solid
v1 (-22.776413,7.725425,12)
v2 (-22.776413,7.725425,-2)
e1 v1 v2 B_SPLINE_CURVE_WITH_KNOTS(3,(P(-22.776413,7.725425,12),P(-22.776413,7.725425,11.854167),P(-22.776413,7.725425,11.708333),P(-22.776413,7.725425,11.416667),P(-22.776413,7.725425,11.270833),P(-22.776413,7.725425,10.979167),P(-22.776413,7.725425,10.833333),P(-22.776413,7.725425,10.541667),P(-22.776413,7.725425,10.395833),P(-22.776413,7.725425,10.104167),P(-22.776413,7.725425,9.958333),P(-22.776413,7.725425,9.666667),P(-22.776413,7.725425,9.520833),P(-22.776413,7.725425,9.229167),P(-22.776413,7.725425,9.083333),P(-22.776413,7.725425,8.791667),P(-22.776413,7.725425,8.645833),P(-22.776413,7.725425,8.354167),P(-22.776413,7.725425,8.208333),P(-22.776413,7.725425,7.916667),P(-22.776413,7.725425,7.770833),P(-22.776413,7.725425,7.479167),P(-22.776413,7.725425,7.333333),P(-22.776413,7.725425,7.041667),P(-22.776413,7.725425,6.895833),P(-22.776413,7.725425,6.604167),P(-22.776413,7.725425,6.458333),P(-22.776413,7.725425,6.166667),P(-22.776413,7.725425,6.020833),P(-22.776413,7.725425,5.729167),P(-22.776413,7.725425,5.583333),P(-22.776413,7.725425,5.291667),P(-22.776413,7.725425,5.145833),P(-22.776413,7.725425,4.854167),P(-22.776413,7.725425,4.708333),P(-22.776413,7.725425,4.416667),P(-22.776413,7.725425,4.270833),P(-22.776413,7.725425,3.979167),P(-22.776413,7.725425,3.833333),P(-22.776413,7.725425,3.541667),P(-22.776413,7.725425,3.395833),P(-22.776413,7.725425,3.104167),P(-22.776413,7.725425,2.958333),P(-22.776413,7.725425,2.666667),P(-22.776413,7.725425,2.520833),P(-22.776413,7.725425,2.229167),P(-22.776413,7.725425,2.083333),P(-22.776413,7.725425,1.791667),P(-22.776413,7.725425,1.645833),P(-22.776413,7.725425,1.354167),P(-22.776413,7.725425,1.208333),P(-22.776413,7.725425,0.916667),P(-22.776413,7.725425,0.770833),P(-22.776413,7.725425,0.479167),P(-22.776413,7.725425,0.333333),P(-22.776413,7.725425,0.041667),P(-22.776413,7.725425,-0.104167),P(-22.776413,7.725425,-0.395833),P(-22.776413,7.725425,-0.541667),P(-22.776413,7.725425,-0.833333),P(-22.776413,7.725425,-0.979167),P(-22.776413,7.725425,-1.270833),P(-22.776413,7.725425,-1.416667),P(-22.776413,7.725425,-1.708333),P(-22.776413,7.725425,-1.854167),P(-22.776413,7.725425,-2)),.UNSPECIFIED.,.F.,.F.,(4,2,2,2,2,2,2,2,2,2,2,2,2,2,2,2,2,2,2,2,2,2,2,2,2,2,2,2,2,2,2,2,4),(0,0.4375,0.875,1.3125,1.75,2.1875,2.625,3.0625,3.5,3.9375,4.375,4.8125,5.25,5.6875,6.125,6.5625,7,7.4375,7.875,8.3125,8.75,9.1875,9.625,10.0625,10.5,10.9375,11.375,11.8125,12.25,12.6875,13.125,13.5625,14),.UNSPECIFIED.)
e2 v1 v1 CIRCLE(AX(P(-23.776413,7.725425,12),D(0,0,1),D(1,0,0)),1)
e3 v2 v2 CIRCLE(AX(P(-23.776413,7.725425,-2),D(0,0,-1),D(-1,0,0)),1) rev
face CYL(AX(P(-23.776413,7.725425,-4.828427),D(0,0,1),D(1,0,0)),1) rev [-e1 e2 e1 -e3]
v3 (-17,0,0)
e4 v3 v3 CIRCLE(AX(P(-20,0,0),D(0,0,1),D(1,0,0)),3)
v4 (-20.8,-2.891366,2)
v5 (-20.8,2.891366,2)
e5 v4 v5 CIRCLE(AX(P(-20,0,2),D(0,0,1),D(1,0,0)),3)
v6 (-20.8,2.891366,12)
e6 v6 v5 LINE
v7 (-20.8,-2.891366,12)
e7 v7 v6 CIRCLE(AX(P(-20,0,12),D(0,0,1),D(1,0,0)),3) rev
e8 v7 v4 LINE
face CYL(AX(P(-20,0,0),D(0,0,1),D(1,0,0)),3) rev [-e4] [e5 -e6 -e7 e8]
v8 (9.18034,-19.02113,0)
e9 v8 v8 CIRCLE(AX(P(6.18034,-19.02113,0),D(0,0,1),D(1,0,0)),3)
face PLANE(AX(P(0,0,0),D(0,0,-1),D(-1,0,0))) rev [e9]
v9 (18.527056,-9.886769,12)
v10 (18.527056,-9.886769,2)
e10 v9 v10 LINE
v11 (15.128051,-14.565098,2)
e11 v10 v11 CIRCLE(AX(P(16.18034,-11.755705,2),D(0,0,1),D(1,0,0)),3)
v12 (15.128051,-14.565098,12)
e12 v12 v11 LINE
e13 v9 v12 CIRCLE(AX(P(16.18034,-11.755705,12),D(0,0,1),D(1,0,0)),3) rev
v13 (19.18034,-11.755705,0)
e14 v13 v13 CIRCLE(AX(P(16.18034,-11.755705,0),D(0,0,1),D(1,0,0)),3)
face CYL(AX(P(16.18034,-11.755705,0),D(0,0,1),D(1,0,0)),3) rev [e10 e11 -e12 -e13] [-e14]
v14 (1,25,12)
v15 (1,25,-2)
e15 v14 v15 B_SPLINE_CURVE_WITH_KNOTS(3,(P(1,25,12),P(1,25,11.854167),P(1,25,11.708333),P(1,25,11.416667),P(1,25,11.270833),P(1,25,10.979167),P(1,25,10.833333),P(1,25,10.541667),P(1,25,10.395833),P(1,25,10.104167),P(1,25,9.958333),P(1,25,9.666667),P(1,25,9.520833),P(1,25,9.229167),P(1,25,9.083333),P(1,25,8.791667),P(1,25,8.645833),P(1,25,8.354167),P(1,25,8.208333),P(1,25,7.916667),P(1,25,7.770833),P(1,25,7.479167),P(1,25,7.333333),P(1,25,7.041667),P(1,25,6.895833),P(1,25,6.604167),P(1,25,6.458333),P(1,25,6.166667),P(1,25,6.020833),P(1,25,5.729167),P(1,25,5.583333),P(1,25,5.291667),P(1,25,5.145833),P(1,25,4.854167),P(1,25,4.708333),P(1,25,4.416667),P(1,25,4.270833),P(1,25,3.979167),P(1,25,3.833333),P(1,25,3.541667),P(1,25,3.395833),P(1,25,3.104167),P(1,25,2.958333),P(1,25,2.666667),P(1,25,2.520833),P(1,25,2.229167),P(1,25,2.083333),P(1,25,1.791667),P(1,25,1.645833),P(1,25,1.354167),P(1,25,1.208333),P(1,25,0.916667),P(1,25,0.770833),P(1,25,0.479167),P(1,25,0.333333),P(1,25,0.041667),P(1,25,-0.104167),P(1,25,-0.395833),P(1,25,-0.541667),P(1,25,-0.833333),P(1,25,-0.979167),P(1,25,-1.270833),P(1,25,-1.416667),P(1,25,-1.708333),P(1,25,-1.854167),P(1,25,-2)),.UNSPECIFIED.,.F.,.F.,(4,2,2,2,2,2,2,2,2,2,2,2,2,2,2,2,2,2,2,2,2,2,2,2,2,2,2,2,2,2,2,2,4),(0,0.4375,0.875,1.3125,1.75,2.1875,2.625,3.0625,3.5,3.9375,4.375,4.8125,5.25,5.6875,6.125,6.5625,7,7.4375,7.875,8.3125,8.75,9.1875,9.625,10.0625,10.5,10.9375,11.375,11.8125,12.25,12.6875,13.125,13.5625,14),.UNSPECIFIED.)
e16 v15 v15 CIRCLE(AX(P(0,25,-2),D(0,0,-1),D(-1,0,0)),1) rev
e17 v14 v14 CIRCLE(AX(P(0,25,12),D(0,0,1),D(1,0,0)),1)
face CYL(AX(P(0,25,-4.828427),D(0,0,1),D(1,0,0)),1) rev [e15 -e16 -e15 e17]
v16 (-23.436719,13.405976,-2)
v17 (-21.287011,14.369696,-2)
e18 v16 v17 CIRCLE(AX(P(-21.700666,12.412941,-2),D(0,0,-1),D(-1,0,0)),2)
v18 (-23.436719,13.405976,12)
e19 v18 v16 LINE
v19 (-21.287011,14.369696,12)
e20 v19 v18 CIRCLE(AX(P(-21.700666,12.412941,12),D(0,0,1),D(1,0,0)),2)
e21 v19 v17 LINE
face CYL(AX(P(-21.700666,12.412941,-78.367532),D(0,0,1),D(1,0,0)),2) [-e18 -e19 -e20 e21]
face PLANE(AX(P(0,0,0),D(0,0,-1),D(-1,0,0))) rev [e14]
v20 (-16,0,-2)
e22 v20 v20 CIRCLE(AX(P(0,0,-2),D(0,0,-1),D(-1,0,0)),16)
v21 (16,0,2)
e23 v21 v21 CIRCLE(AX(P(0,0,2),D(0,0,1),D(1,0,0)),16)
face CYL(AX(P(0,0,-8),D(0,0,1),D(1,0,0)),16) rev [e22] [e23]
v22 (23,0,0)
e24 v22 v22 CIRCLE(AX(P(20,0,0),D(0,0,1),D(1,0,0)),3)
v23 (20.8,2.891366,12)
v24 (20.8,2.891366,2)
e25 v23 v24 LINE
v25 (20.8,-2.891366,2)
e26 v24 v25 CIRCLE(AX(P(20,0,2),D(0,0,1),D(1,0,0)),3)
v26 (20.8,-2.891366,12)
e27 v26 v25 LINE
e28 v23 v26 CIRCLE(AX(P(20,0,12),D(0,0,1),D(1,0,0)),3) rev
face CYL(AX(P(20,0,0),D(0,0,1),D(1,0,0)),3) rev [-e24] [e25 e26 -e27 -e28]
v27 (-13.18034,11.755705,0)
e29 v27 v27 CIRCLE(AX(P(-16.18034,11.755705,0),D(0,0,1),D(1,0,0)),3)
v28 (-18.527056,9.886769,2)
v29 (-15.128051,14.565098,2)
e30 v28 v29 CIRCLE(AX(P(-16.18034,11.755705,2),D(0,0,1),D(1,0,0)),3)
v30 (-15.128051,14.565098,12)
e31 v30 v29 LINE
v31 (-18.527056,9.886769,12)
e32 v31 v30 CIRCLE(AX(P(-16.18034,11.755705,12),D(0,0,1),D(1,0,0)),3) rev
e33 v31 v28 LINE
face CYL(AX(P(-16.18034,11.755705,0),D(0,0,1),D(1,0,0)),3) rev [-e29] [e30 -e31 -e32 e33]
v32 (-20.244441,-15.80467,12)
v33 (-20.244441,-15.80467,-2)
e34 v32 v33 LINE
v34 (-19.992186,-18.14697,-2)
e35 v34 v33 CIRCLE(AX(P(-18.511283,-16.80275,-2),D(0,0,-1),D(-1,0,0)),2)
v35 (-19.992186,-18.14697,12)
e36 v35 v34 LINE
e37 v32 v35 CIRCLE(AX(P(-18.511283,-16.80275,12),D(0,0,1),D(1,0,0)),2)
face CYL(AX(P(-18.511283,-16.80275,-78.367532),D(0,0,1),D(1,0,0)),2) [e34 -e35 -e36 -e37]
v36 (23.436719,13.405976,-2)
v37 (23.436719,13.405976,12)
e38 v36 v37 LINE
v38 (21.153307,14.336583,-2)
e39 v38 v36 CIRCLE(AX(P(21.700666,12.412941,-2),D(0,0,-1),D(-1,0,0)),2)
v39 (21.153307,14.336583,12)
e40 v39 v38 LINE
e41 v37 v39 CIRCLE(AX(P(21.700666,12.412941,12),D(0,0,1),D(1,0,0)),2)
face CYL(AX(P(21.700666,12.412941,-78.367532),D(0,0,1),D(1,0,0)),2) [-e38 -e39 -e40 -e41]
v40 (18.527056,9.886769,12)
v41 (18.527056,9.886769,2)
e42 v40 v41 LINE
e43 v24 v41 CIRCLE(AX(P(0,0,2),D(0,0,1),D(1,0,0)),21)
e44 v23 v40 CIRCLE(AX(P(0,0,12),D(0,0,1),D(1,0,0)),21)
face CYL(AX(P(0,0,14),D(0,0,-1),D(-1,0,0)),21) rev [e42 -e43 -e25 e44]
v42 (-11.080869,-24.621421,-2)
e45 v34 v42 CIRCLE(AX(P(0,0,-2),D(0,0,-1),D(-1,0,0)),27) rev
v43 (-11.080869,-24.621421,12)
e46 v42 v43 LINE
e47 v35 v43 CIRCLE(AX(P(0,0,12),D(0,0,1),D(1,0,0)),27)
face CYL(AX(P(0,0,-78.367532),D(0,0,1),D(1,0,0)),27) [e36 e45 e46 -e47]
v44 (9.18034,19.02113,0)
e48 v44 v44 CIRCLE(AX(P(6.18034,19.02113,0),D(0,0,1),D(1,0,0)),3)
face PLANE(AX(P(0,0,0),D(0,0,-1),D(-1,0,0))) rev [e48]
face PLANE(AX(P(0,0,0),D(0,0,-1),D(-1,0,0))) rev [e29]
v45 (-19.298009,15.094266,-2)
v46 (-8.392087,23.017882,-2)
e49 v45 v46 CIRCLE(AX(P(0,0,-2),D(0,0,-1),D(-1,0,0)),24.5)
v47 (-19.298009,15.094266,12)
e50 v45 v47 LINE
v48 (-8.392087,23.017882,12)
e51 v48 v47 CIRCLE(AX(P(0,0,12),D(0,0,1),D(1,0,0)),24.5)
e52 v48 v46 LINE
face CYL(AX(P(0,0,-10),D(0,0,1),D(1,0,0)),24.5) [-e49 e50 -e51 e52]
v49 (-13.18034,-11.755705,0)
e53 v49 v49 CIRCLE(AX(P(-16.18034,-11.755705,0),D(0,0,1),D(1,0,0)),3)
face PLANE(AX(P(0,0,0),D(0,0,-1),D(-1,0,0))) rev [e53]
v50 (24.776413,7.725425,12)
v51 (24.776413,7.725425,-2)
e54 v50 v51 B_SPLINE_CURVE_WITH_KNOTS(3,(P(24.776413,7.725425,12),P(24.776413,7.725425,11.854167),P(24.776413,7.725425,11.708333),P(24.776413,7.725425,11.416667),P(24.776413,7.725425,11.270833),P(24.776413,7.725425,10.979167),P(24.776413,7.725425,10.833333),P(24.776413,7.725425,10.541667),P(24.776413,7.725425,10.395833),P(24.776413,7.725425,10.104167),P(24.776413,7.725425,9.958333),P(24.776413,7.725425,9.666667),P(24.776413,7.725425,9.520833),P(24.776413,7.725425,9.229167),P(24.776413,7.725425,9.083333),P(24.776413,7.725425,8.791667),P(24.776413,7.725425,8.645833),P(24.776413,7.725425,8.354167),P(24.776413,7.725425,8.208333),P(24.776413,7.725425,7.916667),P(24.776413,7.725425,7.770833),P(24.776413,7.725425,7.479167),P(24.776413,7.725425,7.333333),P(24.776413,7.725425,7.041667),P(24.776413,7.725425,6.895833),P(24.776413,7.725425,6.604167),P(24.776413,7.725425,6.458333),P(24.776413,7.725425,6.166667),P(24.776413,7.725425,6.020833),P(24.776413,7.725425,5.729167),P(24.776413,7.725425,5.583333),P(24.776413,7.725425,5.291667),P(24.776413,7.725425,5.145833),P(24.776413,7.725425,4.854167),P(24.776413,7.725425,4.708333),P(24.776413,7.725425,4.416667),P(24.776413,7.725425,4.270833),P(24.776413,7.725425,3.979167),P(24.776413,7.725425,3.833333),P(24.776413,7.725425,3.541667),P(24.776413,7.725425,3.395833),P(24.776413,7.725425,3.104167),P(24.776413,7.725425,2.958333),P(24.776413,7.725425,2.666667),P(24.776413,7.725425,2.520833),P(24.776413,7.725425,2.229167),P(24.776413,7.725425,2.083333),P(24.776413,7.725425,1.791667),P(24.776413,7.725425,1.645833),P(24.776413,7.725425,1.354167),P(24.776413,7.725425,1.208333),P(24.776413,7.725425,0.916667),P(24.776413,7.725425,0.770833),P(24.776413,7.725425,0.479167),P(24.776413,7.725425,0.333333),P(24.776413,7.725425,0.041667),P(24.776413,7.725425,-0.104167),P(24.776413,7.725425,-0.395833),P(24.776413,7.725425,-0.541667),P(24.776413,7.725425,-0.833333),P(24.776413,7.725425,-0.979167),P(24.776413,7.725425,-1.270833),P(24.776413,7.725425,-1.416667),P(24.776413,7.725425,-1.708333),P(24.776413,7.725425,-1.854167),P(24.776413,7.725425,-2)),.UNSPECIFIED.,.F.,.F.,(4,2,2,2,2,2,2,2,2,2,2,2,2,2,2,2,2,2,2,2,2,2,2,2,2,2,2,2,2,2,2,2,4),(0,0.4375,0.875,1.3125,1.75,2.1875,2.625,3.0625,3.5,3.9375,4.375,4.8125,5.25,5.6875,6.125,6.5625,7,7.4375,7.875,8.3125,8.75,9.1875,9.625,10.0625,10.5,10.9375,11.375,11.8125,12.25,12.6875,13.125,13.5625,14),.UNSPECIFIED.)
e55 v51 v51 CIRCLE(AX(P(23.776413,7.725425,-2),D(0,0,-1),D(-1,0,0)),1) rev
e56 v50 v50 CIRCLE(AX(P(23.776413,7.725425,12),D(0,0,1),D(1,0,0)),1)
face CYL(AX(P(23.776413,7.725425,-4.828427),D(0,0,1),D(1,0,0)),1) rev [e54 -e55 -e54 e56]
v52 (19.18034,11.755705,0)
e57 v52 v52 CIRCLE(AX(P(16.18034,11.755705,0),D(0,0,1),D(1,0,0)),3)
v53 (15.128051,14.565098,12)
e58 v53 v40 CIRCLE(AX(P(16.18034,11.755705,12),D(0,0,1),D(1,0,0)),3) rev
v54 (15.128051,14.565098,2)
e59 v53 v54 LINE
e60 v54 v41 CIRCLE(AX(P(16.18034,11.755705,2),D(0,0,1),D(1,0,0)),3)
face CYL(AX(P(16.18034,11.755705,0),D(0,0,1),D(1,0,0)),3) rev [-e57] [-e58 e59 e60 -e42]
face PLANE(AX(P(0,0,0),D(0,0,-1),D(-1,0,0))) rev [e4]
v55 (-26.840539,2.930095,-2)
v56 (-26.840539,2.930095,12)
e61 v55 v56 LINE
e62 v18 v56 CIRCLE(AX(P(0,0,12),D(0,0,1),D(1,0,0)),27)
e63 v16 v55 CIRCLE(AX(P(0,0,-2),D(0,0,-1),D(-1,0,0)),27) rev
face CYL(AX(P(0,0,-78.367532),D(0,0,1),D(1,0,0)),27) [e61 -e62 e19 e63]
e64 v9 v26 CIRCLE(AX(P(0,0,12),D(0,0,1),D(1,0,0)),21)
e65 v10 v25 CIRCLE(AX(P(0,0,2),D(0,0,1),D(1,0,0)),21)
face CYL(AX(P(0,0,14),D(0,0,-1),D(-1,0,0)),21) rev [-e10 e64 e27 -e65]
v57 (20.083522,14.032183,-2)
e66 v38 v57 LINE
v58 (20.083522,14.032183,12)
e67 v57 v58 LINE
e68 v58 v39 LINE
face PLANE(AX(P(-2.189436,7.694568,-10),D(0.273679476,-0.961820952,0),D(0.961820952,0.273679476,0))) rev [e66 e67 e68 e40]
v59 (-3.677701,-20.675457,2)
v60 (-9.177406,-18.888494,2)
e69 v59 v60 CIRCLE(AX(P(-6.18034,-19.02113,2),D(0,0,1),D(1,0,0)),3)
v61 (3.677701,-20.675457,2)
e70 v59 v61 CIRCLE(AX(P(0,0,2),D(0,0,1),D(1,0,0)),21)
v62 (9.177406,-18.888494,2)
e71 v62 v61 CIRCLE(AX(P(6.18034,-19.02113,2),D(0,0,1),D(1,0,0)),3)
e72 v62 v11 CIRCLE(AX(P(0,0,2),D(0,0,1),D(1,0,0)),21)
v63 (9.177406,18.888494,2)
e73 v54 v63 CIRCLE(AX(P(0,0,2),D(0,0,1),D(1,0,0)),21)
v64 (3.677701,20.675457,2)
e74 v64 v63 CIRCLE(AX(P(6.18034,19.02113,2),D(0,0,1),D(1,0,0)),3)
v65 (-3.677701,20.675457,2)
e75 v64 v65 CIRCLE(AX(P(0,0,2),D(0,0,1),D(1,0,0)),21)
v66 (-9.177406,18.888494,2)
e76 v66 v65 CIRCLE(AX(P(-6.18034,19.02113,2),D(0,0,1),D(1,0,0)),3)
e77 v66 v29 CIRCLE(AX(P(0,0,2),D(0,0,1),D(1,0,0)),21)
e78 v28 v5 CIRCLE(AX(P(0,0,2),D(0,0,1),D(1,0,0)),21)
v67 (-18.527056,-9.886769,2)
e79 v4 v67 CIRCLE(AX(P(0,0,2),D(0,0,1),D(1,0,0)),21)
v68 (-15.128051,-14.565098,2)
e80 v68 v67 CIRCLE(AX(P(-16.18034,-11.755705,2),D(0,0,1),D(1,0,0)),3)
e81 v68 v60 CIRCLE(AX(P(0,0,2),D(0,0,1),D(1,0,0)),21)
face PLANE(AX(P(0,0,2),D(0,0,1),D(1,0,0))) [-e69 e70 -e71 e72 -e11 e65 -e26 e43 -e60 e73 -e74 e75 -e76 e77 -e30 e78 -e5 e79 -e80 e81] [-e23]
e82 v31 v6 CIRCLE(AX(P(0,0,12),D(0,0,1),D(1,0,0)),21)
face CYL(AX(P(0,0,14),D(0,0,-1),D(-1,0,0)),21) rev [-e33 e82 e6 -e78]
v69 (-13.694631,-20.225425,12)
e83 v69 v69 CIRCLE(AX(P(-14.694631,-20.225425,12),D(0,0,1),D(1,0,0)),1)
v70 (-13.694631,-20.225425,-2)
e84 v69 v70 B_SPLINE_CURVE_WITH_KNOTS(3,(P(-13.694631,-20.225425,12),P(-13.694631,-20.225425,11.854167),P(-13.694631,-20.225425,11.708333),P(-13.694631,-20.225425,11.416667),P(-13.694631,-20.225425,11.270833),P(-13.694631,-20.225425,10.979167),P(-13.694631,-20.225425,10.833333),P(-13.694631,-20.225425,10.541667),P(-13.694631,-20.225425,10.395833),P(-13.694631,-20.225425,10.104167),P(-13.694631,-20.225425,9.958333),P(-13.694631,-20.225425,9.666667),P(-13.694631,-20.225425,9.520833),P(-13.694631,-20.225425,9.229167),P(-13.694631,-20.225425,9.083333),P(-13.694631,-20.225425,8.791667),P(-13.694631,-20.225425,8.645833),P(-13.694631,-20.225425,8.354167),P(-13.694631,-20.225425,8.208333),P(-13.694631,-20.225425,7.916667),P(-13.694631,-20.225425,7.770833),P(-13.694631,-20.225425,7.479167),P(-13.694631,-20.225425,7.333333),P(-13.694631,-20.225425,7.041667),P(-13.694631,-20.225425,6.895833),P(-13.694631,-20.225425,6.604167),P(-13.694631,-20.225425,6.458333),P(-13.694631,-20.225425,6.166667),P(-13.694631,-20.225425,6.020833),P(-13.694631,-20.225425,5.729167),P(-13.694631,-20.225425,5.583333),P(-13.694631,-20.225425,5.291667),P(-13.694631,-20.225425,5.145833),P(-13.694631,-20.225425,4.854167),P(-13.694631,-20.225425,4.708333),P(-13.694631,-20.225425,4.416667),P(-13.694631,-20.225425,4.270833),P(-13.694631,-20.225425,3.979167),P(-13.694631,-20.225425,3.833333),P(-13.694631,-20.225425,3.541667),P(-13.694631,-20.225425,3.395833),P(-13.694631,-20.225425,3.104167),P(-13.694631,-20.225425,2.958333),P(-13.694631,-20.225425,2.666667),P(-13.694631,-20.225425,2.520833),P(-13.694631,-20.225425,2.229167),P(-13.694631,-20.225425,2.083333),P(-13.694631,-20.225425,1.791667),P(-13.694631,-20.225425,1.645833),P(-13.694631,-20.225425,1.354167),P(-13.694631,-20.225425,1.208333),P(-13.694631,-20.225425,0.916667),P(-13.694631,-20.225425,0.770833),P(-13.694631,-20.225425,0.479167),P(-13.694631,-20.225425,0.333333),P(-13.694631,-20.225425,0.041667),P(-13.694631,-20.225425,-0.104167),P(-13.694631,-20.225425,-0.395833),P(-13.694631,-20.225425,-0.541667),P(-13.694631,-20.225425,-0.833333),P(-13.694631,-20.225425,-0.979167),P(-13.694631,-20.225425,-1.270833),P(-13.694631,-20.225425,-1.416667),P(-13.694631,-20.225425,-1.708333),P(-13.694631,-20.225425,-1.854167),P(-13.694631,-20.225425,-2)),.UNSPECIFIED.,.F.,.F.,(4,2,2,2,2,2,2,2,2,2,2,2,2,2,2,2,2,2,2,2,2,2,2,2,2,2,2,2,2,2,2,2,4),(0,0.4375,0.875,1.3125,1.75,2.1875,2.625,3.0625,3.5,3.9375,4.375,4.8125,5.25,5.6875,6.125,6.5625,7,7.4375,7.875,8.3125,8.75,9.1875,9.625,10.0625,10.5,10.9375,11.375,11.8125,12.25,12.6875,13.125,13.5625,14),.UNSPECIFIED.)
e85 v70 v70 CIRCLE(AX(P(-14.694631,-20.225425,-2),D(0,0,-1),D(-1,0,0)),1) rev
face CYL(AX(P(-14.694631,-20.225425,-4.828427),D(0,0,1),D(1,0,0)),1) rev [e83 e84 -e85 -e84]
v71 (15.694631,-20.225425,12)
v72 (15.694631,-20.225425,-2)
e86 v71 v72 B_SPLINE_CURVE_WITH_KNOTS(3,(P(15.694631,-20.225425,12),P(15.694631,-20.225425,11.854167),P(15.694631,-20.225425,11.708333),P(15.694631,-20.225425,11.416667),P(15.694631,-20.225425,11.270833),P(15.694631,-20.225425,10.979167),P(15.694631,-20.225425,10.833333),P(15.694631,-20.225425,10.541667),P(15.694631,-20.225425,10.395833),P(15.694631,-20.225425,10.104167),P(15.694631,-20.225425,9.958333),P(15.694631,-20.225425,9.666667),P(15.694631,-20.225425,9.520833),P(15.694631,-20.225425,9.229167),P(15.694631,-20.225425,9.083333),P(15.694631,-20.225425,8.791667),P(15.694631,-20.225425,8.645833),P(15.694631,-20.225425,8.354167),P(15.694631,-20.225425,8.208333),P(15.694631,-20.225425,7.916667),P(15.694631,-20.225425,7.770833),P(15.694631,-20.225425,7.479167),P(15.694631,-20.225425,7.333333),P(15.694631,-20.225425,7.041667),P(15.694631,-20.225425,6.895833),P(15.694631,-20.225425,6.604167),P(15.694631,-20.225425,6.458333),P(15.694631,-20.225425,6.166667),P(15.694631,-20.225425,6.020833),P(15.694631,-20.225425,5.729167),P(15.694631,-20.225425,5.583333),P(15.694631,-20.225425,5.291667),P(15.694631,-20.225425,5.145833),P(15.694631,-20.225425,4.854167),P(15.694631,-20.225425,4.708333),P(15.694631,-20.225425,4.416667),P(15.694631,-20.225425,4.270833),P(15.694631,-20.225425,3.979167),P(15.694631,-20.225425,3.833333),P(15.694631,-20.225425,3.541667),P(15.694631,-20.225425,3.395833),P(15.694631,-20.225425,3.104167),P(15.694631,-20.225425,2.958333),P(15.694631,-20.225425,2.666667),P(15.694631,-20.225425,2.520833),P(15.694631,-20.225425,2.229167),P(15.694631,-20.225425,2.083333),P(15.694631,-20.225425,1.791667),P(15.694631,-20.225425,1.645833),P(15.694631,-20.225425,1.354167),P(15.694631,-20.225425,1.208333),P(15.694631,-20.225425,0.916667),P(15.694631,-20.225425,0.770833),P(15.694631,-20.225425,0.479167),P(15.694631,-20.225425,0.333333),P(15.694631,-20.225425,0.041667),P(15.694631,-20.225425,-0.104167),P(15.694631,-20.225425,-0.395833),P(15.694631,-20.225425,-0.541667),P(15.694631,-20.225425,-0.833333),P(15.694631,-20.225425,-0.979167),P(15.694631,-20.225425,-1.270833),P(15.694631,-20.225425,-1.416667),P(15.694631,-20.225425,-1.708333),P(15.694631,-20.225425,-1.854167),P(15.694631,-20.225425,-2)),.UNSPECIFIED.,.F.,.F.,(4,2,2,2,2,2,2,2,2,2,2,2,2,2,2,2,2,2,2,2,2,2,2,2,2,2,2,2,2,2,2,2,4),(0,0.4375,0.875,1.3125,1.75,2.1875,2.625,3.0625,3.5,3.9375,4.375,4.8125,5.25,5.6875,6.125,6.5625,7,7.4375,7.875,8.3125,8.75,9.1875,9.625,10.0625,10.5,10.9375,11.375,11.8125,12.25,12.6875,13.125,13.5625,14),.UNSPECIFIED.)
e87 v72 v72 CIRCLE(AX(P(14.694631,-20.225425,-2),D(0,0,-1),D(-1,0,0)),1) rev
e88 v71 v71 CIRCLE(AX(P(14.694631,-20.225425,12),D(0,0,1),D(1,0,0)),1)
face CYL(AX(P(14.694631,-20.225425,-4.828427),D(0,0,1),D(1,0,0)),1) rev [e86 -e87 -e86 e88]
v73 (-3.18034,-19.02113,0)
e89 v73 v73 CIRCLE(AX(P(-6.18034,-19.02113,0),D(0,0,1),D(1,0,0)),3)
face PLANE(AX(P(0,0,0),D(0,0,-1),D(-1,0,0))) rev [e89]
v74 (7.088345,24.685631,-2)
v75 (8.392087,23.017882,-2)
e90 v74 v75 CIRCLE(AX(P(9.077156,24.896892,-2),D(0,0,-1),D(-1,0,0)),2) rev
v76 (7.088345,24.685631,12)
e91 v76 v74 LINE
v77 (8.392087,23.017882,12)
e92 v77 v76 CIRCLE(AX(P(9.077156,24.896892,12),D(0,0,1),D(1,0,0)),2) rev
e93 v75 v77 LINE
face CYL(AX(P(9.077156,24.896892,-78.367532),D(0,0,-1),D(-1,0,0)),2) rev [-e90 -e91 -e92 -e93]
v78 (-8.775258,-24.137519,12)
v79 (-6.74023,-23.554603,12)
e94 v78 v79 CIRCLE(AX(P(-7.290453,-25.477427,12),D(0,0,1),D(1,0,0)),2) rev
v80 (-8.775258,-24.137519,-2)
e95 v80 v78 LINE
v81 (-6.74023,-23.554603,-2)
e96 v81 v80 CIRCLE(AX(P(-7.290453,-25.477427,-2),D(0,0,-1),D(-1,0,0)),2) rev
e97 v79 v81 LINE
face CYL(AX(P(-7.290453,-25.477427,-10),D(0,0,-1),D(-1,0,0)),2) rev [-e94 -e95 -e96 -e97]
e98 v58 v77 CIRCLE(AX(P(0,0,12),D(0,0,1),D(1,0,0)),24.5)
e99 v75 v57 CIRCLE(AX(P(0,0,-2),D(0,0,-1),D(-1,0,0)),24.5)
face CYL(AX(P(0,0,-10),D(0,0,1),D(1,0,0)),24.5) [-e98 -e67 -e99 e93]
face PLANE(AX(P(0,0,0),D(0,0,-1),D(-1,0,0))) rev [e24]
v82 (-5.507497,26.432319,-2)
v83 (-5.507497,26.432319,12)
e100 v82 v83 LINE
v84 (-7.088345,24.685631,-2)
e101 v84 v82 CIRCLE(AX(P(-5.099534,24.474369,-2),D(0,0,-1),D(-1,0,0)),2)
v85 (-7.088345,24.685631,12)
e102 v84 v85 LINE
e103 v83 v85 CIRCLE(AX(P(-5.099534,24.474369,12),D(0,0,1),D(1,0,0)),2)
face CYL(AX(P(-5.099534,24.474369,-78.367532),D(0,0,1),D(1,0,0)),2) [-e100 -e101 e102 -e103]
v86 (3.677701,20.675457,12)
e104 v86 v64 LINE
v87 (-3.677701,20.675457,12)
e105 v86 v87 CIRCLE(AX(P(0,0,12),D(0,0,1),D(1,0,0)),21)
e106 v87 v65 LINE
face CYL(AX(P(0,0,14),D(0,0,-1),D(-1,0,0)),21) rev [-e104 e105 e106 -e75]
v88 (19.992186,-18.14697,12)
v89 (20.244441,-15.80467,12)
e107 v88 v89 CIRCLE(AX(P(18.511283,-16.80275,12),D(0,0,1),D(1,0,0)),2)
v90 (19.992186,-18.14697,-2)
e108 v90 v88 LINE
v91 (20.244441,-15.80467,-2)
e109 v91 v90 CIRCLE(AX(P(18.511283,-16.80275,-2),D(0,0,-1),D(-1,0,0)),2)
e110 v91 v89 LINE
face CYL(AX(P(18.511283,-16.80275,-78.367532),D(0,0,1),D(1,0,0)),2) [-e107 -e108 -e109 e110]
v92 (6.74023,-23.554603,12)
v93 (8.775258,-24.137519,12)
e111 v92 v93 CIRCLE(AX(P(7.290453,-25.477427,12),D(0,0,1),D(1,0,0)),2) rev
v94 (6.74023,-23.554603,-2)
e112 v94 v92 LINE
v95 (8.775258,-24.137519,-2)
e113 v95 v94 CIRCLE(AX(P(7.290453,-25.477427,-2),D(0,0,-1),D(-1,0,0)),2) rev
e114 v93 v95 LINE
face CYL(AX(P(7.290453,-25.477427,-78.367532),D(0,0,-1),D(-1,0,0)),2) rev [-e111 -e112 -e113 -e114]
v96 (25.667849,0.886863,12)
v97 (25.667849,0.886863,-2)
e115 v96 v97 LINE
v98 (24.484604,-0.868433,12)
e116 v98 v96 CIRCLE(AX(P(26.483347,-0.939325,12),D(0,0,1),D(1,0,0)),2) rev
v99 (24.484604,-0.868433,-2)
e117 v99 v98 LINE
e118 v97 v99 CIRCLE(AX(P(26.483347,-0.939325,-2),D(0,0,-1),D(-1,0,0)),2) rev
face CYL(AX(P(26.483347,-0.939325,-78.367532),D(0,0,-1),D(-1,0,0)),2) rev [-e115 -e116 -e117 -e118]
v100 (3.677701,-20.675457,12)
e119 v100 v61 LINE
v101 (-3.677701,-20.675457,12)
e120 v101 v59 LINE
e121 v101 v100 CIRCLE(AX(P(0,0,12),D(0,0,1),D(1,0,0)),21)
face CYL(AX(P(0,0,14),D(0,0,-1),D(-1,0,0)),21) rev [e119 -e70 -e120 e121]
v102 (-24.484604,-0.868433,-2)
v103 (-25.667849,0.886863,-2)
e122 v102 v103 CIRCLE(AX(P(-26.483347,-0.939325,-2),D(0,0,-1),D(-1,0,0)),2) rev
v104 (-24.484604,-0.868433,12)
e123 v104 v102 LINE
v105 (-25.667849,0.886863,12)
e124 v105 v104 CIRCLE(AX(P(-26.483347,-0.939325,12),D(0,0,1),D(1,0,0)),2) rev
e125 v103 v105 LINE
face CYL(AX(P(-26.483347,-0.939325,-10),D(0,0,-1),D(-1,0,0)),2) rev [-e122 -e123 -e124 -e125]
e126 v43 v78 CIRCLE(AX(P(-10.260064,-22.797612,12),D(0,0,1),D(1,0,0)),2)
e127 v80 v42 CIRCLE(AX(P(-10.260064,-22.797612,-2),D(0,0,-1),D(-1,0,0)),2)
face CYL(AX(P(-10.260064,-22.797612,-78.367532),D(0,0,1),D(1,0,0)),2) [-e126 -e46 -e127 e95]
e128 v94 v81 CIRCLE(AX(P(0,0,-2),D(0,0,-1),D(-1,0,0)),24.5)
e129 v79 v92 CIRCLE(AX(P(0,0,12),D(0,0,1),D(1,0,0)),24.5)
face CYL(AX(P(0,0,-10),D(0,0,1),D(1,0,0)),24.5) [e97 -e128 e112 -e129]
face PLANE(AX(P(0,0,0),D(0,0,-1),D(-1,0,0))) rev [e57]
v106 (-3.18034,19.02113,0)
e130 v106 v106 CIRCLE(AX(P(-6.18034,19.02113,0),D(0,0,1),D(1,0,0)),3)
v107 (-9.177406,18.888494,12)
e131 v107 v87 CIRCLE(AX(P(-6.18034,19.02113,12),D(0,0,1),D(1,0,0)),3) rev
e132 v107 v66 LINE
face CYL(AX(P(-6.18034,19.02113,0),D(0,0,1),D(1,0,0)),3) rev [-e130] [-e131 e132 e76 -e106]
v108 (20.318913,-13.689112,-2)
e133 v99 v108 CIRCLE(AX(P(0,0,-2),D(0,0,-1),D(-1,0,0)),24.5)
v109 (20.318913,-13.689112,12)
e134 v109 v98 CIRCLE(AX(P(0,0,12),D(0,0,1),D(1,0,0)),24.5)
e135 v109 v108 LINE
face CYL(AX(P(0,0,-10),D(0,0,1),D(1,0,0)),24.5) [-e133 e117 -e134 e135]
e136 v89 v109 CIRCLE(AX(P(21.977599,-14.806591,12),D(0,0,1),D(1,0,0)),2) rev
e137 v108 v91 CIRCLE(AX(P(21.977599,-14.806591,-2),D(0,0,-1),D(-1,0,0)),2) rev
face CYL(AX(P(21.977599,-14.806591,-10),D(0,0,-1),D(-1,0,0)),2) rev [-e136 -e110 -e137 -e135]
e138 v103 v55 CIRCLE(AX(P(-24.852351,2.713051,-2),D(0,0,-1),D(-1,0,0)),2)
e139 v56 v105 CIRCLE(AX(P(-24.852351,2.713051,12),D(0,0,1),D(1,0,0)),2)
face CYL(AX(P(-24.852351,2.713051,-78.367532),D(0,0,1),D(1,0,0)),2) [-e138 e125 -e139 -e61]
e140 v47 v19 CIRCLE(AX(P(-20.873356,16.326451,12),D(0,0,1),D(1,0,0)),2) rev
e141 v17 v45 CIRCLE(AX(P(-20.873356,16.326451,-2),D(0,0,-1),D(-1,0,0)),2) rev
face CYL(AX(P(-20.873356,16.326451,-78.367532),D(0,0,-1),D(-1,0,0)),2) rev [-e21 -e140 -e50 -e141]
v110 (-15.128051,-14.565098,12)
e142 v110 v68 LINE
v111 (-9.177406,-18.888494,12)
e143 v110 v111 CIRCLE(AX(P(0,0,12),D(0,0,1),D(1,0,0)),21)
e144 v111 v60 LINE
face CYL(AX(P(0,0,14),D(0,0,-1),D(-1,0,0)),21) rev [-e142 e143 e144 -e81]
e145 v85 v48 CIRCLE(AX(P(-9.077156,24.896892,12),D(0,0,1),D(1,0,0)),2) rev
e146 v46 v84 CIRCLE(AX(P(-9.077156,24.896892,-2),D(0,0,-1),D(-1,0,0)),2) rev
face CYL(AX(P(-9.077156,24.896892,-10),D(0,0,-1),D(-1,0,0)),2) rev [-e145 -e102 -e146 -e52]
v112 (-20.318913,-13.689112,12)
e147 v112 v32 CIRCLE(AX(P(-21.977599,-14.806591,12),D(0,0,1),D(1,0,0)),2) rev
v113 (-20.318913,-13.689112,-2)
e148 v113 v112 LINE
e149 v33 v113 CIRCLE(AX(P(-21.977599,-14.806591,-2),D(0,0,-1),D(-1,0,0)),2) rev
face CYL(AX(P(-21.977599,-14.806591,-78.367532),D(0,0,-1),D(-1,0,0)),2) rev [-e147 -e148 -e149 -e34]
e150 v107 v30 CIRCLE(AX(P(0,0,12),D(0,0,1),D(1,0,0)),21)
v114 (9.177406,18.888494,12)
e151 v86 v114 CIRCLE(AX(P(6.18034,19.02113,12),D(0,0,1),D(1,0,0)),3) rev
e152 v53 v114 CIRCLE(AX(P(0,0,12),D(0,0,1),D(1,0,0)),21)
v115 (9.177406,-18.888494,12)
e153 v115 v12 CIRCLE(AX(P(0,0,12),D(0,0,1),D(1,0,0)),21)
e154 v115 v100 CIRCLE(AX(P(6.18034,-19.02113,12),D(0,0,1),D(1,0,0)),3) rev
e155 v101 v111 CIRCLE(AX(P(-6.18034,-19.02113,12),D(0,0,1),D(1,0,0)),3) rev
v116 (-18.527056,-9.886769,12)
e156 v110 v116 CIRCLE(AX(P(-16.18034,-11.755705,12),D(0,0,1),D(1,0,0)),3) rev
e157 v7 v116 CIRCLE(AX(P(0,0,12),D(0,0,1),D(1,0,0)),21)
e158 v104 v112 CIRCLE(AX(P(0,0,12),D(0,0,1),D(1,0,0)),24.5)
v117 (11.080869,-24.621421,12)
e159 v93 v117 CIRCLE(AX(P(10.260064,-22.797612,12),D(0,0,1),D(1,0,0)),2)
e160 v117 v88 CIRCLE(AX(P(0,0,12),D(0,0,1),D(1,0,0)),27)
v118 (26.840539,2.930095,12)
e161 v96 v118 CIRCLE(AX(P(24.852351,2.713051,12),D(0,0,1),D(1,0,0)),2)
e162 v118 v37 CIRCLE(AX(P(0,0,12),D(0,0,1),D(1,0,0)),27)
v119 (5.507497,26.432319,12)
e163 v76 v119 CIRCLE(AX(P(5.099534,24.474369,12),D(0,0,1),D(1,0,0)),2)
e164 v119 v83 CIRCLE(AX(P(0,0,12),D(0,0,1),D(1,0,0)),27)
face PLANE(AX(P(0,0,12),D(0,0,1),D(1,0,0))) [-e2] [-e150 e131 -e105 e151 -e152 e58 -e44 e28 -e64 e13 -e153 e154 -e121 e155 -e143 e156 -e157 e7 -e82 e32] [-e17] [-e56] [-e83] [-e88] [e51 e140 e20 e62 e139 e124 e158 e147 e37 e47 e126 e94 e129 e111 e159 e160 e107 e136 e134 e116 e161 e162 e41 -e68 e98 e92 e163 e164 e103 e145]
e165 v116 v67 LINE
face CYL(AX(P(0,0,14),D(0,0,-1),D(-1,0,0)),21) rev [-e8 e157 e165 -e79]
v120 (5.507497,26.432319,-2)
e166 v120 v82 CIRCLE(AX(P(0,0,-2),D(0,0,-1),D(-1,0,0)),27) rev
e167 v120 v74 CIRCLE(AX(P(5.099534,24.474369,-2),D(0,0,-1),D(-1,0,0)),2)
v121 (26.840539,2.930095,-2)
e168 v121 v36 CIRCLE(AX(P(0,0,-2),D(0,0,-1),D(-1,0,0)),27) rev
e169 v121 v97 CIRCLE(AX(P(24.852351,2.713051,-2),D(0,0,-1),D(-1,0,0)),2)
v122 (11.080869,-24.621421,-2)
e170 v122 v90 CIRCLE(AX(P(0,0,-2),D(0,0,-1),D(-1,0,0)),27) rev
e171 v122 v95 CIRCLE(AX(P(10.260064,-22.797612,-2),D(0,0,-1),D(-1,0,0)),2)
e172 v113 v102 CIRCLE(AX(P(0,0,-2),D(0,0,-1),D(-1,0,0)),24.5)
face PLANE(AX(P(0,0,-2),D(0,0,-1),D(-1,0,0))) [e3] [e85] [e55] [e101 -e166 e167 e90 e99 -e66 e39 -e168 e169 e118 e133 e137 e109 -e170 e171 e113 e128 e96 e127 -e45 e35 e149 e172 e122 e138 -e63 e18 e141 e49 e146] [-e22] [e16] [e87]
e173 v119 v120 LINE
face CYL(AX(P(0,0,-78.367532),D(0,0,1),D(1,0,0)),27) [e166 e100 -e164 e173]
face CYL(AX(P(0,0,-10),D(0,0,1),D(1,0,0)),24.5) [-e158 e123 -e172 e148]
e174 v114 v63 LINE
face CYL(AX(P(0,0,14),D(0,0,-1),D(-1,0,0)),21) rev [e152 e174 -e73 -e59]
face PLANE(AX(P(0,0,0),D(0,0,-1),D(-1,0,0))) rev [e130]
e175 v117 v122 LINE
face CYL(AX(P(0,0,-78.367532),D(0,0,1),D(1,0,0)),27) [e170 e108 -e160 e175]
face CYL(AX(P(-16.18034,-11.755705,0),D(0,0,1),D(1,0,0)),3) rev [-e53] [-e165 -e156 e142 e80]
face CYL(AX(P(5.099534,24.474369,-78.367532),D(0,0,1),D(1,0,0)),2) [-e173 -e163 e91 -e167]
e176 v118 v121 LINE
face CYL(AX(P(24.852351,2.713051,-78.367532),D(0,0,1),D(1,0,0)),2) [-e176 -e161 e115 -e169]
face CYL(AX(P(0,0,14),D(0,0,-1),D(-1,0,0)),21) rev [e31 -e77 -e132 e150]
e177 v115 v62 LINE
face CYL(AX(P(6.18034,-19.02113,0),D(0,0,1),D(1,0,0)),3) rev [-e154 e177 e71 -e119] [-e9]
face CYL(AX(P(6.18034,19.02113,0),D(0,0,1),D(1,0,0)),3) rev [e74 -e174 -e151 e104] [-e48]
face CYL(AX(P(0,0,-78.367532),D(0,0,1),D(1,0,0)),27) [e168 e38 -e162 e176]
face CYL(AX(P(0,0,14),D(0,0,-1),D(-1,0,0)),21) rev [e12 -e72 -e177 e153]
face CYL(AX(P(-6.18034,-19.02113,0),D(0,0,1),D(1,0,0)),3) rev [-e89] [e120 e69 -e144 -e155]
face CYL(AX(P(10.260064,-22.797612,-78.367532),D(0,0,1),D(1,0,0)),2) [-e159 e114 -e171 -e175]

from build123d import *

# Parameters (mm, degrees)
SKETCH_1_R          = 25
EXTRUDE_1_DEPTH     = 2
SKETCH_2_R          = 2.9999999999999973
SKETCH_2_R_2        = 2.999999999999996
SKETCH_2_R_3        = 2.999999999999999
SKETCH_2_R_4        = 3
SKETCH_2_R_5        = 2.999999999999997
SKETCH_2_R_6        = 2.9999999999999982
EXTRUDE_2_DEPTH     = 10
SKETCH_3_R          = 16
CUT_EXTRUDE_1_DEPTH = 10
CUT_EXTRUDE_START   = -12
SKETCH_4_R          = 2.999999999999994
SKETCH_4_R_2        = 2.9999999999999973
SKETCH_4_R_3        = 2.999999999999997
SKETCH_4_R_4        = 2.9999999999999996
SKETCH_4_R_5        = 2.999999999999999
CUT_EXTRUDE_2_DEPTH = 12
SKETCH_5_R          = 25
EXTRUDE_3_DEPTH     = 12
SKETCH_7_R          = 25
SKETCH_7_R_2        = 16
EXTRUDE_4_DEPTH     = 2
SKETCH_8_R          = 25
CUT_EXTRUDE_3_DEPTH = 2
SKETCH_9_R          = 1.0000000000000007
SKETCH_9_R_2        = 1.0000000000000009
SKETCH_9_R_3        = 1
SKETCH_9_R_4        = 1.0000000000000013
SKETCH_9_R_5        = 1.0000000000000018
SKETCH_9_R_6        = 0.9999999999999993
SKETCH_9_R_7        = 1.0000000000000056
SKETCH_9_R_8        = 0.9999999999999979
SKETCH_9_R_9        = 1.000000000000004
CUT_EXTRUDE_4_DEPTH = 15
SKETCH_10_R         = 27
SKETCH_10_R_2       = 25
EXTRUDE_5_DEPTH     = 14
SKETCH_11_R         = 1.0000000000000013
SKETCH_11_R_2       = 1.0000000000000018
SKETCH_11_R_3       = 1.0000000000000002
SKETCH_11_R_4       = 0.9999999999999983
SKETCH_11_R_5       = 1.0000000000000056
SKETCH_11_R_6       = 1.0000000000000053
EXTRUDE_6_DEPTH     = 14
SKETCH_12_R         = 1.000000000002179
SKETCH_12_R_2       = 1.0000000000021785
SKETCH_12_R_3       = 1.000000000002178
SKETCH_12_R_4       = 1.0000000000021796
CUT_EXTRUDE_5_DEPTH = 14
CUT_EXTRUDE_7_DEPTH = 22
FILLET_1_R          = 2
FILLET_2_R          = 2
FILLET_3_R          = 2
FILLET_4_R          = 2


with BuildPart() as part:
    # 草图1 → 凸台-拉伸1 (new body)
    with BuildSketch(Plane.XY):
        Circle(SKETCH_1_R)
    extrude(amount=EXTRUDE_1_DEPTH)

    # 草图2 → 凸台-拉伸2 (add)
    with BuildSketch(Plane.XY.offset(2)):
        with Locations((20, 0)):
            Circle(SKETCH_2_R)
        with Locations((16.18033988749894, -11.755705045849487)):
            Circle(SKETCH_2_R_2)
        with Locations((6.180339887498899, -19.021130325903094)):
            Circle(SKETCH_2_R_3)
        with Locations((-6.180339887499034, -19.021130325903048)):
            Circle(SKETCH_2_R_4)
        with Locations((-16.180339887499017, -11.755705045849368)):
            Circle(SKETCH_2_R_5)
        with Locations((-20, 1.3966e-13)):
            Circle(SKETCH_2_R_6)
        with Locations((-16.180339887498842, 11.755705045849606)):
            Circle(SKETCH_2_R_3)
        with Locations((-6.180339887498764, 19.021130325903133)):
            Circle(SKETCH_2_R_5)
        with Locations((6.180339887499164, 19.021130325903002)):
            Circle(SKETCH_2_R_5)
        with Locations((16.180339887499105, 11.755705045849252)):
            Circle(SKETCH_2_R_5)
    extrude(amount=EXTRUDE_2_DEPTH)

    # 草图3 → 切除-拉伸1 (cut)
    with BuildSketch(Plane.XY.offset(2)):
        Circle(SKETCH_3_R)
    extrude(amount=-CUT_EXTRUDE_1_DEPTH, mode=Mode.SUBTRACT)

    # 草图4 → 切除-拉伸2 (cut)
    with BuildSketch(Plane.XY.offset(12).offset(CUT_EXTRUDE_START)):
        with Locations((16.180339887499105, 11.755705045849252)):
            Circle(SKETCH_4_R)
        with Locations((6.180339887499164, 19.021130325903002)):
            Circle(SKETCH_4_R_2)
        with Locations((-6.180339887498764, 19.021130325903133)):
            Circle(SKETCH_4_R_3)
        with Locations((-16.180339887498842, 11.755705045849606)):
            Circle(SKETCH_4_R_4)
        with Locations((-20, 1.3966e-13)):
            Circle(SKETCH_4_R_2)
        with Locations((-16.180339887499017, -11.755705045849368)):
            Circle(SKETCH_4_R_2)
        with Locations((-6.180339887499034, -19.021130325903048)):
            Circle(SKETCH_4_R_4)
        with Locations((16.18033988749894, -11.755705045849487)):
            Circle(SKETCH_4_R)
        with Locations((20, 0)):
            Circle(SKETCH_4_R_2)
        with Locations((6.180339887498899, -19.021130325903094)):
            Circle(SKETCH_4_R_5)
    extrude(amount=CUT_EXTRUDE_2_DEPTH, mode=Mode.SUBTRACT)

    # 草图5 → 凸台-拉伸3 (add)
    with BuildSketch(Plane.XY.offset(2)):
        Circle(SKETCH_5_R)
        with BuildLine():
            ThreePointArc((18.527056046548942, 9.886768645418698), (19.972186842198262, 6.489356881873777), (20.799999999999997, 2.8913664589602024))
            ThreePointArc((20.8, 2.891366458960203), (23.00000000000001, -4.4e-16), (20.8, -2.8913664589602033))
            ThreePointArc((20.799999999999997, -2.89136645896021), (19.972186842198212, -6.4893568818739364), (18.527056046548797, -9.886768645418973))
            ThreePointArc((18.527056046548804, -9.886768645418968), (18.60739087062377, -13.519060802726909), (15.128050919448983, -14.56509784994797))
            ThreePointArc((15.12805091944897, -14.565097849947978), (12.343490298141901, -16.98935688187392), (9.177406394790198, -18.8884941661548))
            ThreePointArc((9.1774063947902, -18.8884941661548), (7.107390870623737, -21.874299874788566), (3.677700571207507, -20.67545691172362))
            ThreePointArc((3.6777005712075, -20.67545691172362), (-7.846e-14, -21), (-3.6777005712076543, -20.675456911723593))
            ThreePointArc((-3.6777005712076534, -20.675456911723593), (-7.107390870623893, -21.874299874788516), (-9.177406394790339, -18.88849416615474))
            ThreePointArc((-9.177406394790339, -18.888494166154732), (-12.34349029814203, -16.989356881873828), (-15.128050919449079, -14.565097849947863))
            ThreePointArc((-15.128050919449075, -14.565097849947865), (-18.607390870623878, -13.519060802726777), (-18.52705604654888, -9.886768645418814))
            ThreePointArc((-18.527056046548882, -9.88676864541881), (-19.972186842198266, -6.4893568818737695), (-20.80000000000002, -2.891366458960054))
            ThreePointArc((-20.80000000000002, -2.891366458960057), (-23.00000000000001, 1.6231e-13), (-20.799999999999976, 2.8913664589603485))
            ThreePointArc((-20.799999999999976, 2.891366458960355), (-19.972186842198173, 6.489356881874057), (-18.527056046548736, 9.886768645419087))
            ThreePointArc((-18.527056046548736, 9.886768645419089), (-18.607390870623675, 13.519060802727054), (-15.128050919448857, 14.565097849948092))
            ThreePointArc((-15.128050919448855, 14.565097849948096), (-12.343490298141768, 16.989356881874016), (-9.17740639479005, 18.888494166154874))
            ThreePointArc((-9.177406394790053, 18.888494166154874), (-7.107390870623576, 21.874299874788594), (-3.67770057120738, 20.675456911723643))
            ThreePointArc((-3.677700571207379, 20.675456911723643), (2.1112e-13, 21), (3.6777005712077946, 20.67545691172357))
            ThreePointArc((3.677700571207796, 20.675456911723565), (7.107390870624042, 21.874299874788463), (9.177406394790463, 18.888494166154672))
            ThreePointArc((9.177406394790463, 18.888494166154672), (12.343490298142148, 16.989356881873743), (15.128050919449189, 14.56509784994775))
            ThreePointArc((15.12805091944919, 14.565097849947751), (18.607390870623963, 13.519060802726637), (18.527056046548942, 9.886768645418698))
        make_face(mode=Mode.SUBTRACT)
    extrude(amount=EXTRUDE_3_DEPTH)

    # 草图7 → 凸台-拉伸4 (add)
    with BuildSketch(Plane(origin=(0, 0, 0), x_dir=(-1, 0, 0), z_dir=(0, 0, -1))):
        Circle(SKETCH_7_R)
        with Locations(Location((0, 0, 0), (0, 0, 180))):
            Circle(SKETCH_7_R_2, mode=Mode.SUBTRACT)
    extrude(amount=EXTRUDE_4_DEPTH)

    # 草图8 → 切除-拉伸3 (cut)
    with BuildSketch(Plane.XY.offset(14)):
        with Locations(Location((0, 0, 0), (0, 0, 180))):
            Circle(SKETCH_8_R)
    extrude(amount=-CUT_EXTRUDE_3_DEPTH, mode=Mode.SUBTRACT)

    # 草图9 → 切除-拉伸4 (cut)
    with BuildSketch(Plane.XY.offset(12)):
        with Locations((21.87429987478853, -7.107390870623803)):
            Circle(SKETCH_9_R)
        with Locations((13.51906080272685, -18.607390870623824)):
            Circle(SKETCH_9_R_2)
        with Locations((-7.72e-14, -23.000000000000007)):
            Circle(SKETCH_9_R_3)
        with Locations((-13.519060802726976, -18.60739087062372)):
            Circle(SKETCH_9_R_4)
        with Locations((-21.87429987478858, -7.107390870623654)):
            Circle(SKETCH_9_R_5)
        with Locations((-21.87429987478848, 7.107390870623958)):
            Circle(SKETCH_9_R_6)
        with Locations((-13.519060802726708, 18.607390870623917)):
            Circle(SKETCH_9_R_2)
        with Locations((2.3592e-13, 23)):
            Circle(SKETCH_9_R_7)
        with Locations((13.51906080272711, 18.607390870623636)):
            Circle(SKETCH_9_R_8)
        with Locations((21.874299874788626, 7.107390870623489)):
            Circle(SKETCH_9_R_9)
    extrude(amount=-CUT_EXTRUDE_4_DEPTH, mode=Mode.SUBTRACT)

    # 草图10 → 凸台-拉伸5 (add)
    with BuildSketch(Plane.XY.offset(12)):
        Circle(SKETCH_10_R)
        Circle(SKETCH_10_R_2, mode=Mode.SUBTRACT)
    extrude(amount=-EXTRUDE_5_DEPTH)

    # 草图11 → 凸台-拉伸6 (add)
    with BuildSketch(Plane.XY.offset(12)):
        with Locations((-21.87429987478848, 7.107390870623958)):
            Circle(SKETCH_11_R)
        with Locations((-21.87429987478858, -7.107390870623654)):
            Circle(SKETCH_11_R)
        with Locations((-13.519060802726976, -18.60739087062372)):
            Circle(SKETCH_11_R_2)
        with Locations((-7.72e-14, -23.000000000000007)):
            Circle(SKETCH_11_R_3)
        with Locations((13.51906080272685, -18.607390870623824)):
            Circle(SKETCH_11_R_2)
        with Locations((21.87429987478853, -7.107390870623803)):
            Circle(SKETCH_11_R)
        with Locations((13.51906080272711, 18.607390870623636)):
            Circle(SKETCH_11_R_4)
        with Locations((2.3592e-13, 23)):
            Circle(SKETCH_11_R_5)
        with Locations((-13.519060802726708, 18.607390870623917)):
            Circle(SKETCH_11_R_2)
        with Locations((21.874299874788626, 7.107390870623489)):
            Circle(SKETCH_11_R_6)
    extrude(amount=-EXTRUDE_6_DEPTH)

    # 草图12 → 切除-拉伸5 (cut)
    with BuildSketch(Plane.XY.offset(12)):
        with Locations((-4.1e-14, 24.99999999999939)):
            Circle(SKETCH_12_R)
        with Locations((23.77641290737897, 7.72542485937453)):
            Circle(SKETCH_12_R_2)
        with Locations((14.694631307313387, -20.225424859372556)):
            Circle(SKETCH_12_R_3)
        with Locations((-14.694631307309555, -20.225424859373828)):
            Circle(SKETCH_12_R_4)
        with Locations((-23.776412907377555, 7.725424859372463)):
            Circle(SKETCH_12_R_2)
    extrude(amount=-CUT_EXTRUDE_5_DEPTH, mode=Mode.SUBTRACT)

    # 草图13 → 切除-拉伸7 (cut)
    with BuildSketch(Plane.XY.offset(12)):
        with BuildLine():
            Line((-8.000000000001988, -23.15707235381819), (-9.623728197368235, -25.226649709844363))
            ThreePointArc((-9.623728197368237, -25.226649709844366), (-8.816326530615193, -25.52003892053426), (-8.00000000000213, -25.78759391645486))
            ThreePointArc((-8.000000000002057, -25.787593916454625), (-2.14762e-12, -27), (7.999999999997949, -25.78759391645589))
            ThreePointArc((7.999999999997868, -25.787593916455624), (8.816326530611235, -25.520038920535), (9.623728197364583, -25.22664970984507))
            Line((9.62372819736458, -25.226649709845066), (7.999999999999232, -23.157072353819146))
            ThreePointArc((7.9999999999992255, -23.157072353819146), (-1.46061e-12, -24.50000000000005), (-8.000000000001988, -23.157072353818187))
        make_face()
        with BuildLine():
            Line((19.551548605416773, -14.764381027663427), (21.01807402861039, -16.948172884645988))
            ThreePointArc((21.018074028610393, -16.94817288464599), (21.546604585560914, -16.27095052028251), (22.053323278816983, -15.577256894587883))
            ThreePointArc((22.053323278817036, -15.577256894587922), (25.67852593996839, -8.343458848125918), (26.99759518881758, -0.36035263386590666))
            ThreePointArc((26.997595188817435, -0.3603526338659033), (26.99939879051069, -0.18018032901160086), (26.999999999999858, -6.7e-16))
            ThreePointArc((26.999999999999858, -6.7e-16), (26.99146493924519, 0.6788375604585586), (26.965865153074702, 1.3572459416711162))
            Line((26.965865153074702, 1.357245941671117), (24.495820515417392, 0.4525232330598386))
            ThreePointArc((24.4958205154174, 0.45252323305983855), (23.30088464923078, -7.570916362187881), (19.551548605416777, -14.76438102766343))
        make_face()
        with BuildLine():
            Line((-21.018074028612396, -16.948172884643373), (-19.551548605418752, -14.764381027660828))
            ThreePointArc((-19.551548605418755, -14.764381027660827), (-23.300884649231797, -7.57091636218478), (-24.49582051541734, 0.45252323306309894))
            Line((-24.49582051541734, 0.452523233063099), (-26.965865153074635, 1.357245941674412))
            ThreePointArc((-26.96586515307464, 1.357245941674412), (-26.99539403739857, 0.49869907317212836), (-26.997595188817584, -0.36035263386122796))
            ThreePointArc((-26.99759518881765, -0.36035263386122873), (-25.67852593996984, -8.34345884812147), (-22.05332327881974, -15.577256894584103))
            ThreePointArc((-22.053323278819626, -15.577256894584023), (-21.54660458556326, -16.270950520279282), (-21.018074028612396, -16.948172884643373))
        make_face()
        with BuildLine():
            ThreePointArc((-21.62970335119759, 16.16031970411429), (-22.1328605066438, 15.46403846973485), (-22.61361232510881, 14.752102819926334))
            Line((-22.613612325108807, 14.752102819926334), (-20.08352157084352, 14.032183055870734))
            ThreePointArc((-20.083521570843523, 14.032183055870734), (-14.40073868116433, 19.82091636218719), (-7.139249660842761, 23.436747092550178))
            Line((-7.1392496608427605, 23.436747092550178), (-7.042093003278574, 26.06547383289188))
            ThreePointArc((-7.042093003278575, 26.065473832891882), (-7.867744524193498, 25.828251897912484), (-8.685431441197716, 25.564883740792776))
            ThreePointArc((-8.68543144119774, 25.564883740792844), (-15.870201811894914, 21.84345884812494), (-21.629703351197705, 16.16031970411437))
        make_face()
        with BuildLine():
            ThreePointArc((8.685431441202136, 25.5648837407912), (7.867744524197297, 25.82825189791124), (7.042093003281741, 26.065473832890937))
            Line((7.042093003281742, 26.065473832890934), (7.1392496608458895, 23.436747092549233))
            ThreePointArc((7.139249660845888, 23.436747092549233), (14.40073868116698, 19.82091636218528), (20.08352157084539, 14.032183055868058))
            Line((20.08352157084539, 14.032183055868057), (22.613612325110687, 14.752102819923621))
            ThreePointArc((22.613612325110687, 14.752102819923621), (22.132860506646153, 15.464038469731623), (21.629703351200448, 16.16031970411058))
            ThreePointArc((21.62970335120051, 16.160319704110627), (15.870201811898703, 21.843458848122182), (8.685431441202173, 25.56488374079133))
        make_face()
    extrude(amount=-CUT_EXTRUDE_7_DEPTH, mode=Mode.SUBTRACT)

    # 圆角1
    fillet_1_edges = [part.edges().sort_by_distance(p)[0] for p in [
        (9.623728197364583, -25.22664970984507, 5),
    ]]
    fillet(fillet_1_edges, radius=FILLET_1_R)

    # 圆角2
    # the kernel refuses this fillet: 2 mm, written as the material it adds along each edge
    with BuildSketch(Plane(origin=(7.999999999999229, -23.157072353819146, 12), x_dir=(0.6202459479236111, -0.7844073967552455, 0), z_dir=(0, 0, -1))) as fillet_2_piece_1:
        with BuildLine():
            CenterArc((1.3800097701122314, 1.9957647241378909), FILLET_2_R, 202.3654424349486, 63.9051473709884)
            Line((-0.4695416408337477, 1.2347393774721307), (-0.6544967819283467, 1.1586368428055536))
            ThreePointArc((-0.6544967819283467, 1.1586368428055536), (-0.41338697719962225, 0.5494462671092093), (-0.18878813408098413, -0.0660230295443988))
            Line((-0.18878813408098413, -0.0660230295443988), (0.00075897957255916, -0.1999985598698377))
            ThreePointArc((0.00075897957255916, -0.1999985598698377), (1.1130008158552183, -0.19577768530936826), (1.2369117941550487, -0.19957647241378879))
            Line((1.2369117941550487, -0.19957647241378879), (1.2499207010602458, -2e-17))
        make_face()
    extrude(amount=14)

    # 圆角3
    fillet_3_edges = [part.edges().sort_by_distance(p)[0] for p in [
        (22.613612325110687, 14.752102819923621, 5),
        (7.042093003281742, 26.065473832890937, 5),
        (-7.042093003278573, 26.065473832891882, 5),
        (-22.61361232510881, 14.752102819926332, 5),
        (-26.96586515307464, 1.357245941674412, 5),
        (-21.0180740286124, -16.948172884643377, 5),
        (21.018074028610393, -16.94817288464599, 5),
        (26.965865153074702, 1.3572459416711165, 5),
        (-9.623728197368237, -25.226649709844366, 5),
    ]]
    fillet(fillet_3_edges, radius=FILLET_3_R)

    # 圆角4
    fillet_4_edges = [part.edges().sort_by_distance(p)[0] for p in [
        (-8.00000000000199, -23.157072353818187, 5),
        (19.551548605416777, -14.764381027663429, 5),
        (24.4958205154174, 0.45252323305983866, 5),
        (7.139249660845889, 23.436747092549233, 5),
        (-7.139249660842758, 23.436747092550178, 5),
        (-20.083521570843523, 14.032183055870735, 5),
        (-24.49582051541734, 0.45252323306309916, 5),
        (-19.551548605418752, -14.764381027660828, 5),
    ]]
    fillet(fillet_4_edges, radius=FILLET_4_R)


solid = part.part
